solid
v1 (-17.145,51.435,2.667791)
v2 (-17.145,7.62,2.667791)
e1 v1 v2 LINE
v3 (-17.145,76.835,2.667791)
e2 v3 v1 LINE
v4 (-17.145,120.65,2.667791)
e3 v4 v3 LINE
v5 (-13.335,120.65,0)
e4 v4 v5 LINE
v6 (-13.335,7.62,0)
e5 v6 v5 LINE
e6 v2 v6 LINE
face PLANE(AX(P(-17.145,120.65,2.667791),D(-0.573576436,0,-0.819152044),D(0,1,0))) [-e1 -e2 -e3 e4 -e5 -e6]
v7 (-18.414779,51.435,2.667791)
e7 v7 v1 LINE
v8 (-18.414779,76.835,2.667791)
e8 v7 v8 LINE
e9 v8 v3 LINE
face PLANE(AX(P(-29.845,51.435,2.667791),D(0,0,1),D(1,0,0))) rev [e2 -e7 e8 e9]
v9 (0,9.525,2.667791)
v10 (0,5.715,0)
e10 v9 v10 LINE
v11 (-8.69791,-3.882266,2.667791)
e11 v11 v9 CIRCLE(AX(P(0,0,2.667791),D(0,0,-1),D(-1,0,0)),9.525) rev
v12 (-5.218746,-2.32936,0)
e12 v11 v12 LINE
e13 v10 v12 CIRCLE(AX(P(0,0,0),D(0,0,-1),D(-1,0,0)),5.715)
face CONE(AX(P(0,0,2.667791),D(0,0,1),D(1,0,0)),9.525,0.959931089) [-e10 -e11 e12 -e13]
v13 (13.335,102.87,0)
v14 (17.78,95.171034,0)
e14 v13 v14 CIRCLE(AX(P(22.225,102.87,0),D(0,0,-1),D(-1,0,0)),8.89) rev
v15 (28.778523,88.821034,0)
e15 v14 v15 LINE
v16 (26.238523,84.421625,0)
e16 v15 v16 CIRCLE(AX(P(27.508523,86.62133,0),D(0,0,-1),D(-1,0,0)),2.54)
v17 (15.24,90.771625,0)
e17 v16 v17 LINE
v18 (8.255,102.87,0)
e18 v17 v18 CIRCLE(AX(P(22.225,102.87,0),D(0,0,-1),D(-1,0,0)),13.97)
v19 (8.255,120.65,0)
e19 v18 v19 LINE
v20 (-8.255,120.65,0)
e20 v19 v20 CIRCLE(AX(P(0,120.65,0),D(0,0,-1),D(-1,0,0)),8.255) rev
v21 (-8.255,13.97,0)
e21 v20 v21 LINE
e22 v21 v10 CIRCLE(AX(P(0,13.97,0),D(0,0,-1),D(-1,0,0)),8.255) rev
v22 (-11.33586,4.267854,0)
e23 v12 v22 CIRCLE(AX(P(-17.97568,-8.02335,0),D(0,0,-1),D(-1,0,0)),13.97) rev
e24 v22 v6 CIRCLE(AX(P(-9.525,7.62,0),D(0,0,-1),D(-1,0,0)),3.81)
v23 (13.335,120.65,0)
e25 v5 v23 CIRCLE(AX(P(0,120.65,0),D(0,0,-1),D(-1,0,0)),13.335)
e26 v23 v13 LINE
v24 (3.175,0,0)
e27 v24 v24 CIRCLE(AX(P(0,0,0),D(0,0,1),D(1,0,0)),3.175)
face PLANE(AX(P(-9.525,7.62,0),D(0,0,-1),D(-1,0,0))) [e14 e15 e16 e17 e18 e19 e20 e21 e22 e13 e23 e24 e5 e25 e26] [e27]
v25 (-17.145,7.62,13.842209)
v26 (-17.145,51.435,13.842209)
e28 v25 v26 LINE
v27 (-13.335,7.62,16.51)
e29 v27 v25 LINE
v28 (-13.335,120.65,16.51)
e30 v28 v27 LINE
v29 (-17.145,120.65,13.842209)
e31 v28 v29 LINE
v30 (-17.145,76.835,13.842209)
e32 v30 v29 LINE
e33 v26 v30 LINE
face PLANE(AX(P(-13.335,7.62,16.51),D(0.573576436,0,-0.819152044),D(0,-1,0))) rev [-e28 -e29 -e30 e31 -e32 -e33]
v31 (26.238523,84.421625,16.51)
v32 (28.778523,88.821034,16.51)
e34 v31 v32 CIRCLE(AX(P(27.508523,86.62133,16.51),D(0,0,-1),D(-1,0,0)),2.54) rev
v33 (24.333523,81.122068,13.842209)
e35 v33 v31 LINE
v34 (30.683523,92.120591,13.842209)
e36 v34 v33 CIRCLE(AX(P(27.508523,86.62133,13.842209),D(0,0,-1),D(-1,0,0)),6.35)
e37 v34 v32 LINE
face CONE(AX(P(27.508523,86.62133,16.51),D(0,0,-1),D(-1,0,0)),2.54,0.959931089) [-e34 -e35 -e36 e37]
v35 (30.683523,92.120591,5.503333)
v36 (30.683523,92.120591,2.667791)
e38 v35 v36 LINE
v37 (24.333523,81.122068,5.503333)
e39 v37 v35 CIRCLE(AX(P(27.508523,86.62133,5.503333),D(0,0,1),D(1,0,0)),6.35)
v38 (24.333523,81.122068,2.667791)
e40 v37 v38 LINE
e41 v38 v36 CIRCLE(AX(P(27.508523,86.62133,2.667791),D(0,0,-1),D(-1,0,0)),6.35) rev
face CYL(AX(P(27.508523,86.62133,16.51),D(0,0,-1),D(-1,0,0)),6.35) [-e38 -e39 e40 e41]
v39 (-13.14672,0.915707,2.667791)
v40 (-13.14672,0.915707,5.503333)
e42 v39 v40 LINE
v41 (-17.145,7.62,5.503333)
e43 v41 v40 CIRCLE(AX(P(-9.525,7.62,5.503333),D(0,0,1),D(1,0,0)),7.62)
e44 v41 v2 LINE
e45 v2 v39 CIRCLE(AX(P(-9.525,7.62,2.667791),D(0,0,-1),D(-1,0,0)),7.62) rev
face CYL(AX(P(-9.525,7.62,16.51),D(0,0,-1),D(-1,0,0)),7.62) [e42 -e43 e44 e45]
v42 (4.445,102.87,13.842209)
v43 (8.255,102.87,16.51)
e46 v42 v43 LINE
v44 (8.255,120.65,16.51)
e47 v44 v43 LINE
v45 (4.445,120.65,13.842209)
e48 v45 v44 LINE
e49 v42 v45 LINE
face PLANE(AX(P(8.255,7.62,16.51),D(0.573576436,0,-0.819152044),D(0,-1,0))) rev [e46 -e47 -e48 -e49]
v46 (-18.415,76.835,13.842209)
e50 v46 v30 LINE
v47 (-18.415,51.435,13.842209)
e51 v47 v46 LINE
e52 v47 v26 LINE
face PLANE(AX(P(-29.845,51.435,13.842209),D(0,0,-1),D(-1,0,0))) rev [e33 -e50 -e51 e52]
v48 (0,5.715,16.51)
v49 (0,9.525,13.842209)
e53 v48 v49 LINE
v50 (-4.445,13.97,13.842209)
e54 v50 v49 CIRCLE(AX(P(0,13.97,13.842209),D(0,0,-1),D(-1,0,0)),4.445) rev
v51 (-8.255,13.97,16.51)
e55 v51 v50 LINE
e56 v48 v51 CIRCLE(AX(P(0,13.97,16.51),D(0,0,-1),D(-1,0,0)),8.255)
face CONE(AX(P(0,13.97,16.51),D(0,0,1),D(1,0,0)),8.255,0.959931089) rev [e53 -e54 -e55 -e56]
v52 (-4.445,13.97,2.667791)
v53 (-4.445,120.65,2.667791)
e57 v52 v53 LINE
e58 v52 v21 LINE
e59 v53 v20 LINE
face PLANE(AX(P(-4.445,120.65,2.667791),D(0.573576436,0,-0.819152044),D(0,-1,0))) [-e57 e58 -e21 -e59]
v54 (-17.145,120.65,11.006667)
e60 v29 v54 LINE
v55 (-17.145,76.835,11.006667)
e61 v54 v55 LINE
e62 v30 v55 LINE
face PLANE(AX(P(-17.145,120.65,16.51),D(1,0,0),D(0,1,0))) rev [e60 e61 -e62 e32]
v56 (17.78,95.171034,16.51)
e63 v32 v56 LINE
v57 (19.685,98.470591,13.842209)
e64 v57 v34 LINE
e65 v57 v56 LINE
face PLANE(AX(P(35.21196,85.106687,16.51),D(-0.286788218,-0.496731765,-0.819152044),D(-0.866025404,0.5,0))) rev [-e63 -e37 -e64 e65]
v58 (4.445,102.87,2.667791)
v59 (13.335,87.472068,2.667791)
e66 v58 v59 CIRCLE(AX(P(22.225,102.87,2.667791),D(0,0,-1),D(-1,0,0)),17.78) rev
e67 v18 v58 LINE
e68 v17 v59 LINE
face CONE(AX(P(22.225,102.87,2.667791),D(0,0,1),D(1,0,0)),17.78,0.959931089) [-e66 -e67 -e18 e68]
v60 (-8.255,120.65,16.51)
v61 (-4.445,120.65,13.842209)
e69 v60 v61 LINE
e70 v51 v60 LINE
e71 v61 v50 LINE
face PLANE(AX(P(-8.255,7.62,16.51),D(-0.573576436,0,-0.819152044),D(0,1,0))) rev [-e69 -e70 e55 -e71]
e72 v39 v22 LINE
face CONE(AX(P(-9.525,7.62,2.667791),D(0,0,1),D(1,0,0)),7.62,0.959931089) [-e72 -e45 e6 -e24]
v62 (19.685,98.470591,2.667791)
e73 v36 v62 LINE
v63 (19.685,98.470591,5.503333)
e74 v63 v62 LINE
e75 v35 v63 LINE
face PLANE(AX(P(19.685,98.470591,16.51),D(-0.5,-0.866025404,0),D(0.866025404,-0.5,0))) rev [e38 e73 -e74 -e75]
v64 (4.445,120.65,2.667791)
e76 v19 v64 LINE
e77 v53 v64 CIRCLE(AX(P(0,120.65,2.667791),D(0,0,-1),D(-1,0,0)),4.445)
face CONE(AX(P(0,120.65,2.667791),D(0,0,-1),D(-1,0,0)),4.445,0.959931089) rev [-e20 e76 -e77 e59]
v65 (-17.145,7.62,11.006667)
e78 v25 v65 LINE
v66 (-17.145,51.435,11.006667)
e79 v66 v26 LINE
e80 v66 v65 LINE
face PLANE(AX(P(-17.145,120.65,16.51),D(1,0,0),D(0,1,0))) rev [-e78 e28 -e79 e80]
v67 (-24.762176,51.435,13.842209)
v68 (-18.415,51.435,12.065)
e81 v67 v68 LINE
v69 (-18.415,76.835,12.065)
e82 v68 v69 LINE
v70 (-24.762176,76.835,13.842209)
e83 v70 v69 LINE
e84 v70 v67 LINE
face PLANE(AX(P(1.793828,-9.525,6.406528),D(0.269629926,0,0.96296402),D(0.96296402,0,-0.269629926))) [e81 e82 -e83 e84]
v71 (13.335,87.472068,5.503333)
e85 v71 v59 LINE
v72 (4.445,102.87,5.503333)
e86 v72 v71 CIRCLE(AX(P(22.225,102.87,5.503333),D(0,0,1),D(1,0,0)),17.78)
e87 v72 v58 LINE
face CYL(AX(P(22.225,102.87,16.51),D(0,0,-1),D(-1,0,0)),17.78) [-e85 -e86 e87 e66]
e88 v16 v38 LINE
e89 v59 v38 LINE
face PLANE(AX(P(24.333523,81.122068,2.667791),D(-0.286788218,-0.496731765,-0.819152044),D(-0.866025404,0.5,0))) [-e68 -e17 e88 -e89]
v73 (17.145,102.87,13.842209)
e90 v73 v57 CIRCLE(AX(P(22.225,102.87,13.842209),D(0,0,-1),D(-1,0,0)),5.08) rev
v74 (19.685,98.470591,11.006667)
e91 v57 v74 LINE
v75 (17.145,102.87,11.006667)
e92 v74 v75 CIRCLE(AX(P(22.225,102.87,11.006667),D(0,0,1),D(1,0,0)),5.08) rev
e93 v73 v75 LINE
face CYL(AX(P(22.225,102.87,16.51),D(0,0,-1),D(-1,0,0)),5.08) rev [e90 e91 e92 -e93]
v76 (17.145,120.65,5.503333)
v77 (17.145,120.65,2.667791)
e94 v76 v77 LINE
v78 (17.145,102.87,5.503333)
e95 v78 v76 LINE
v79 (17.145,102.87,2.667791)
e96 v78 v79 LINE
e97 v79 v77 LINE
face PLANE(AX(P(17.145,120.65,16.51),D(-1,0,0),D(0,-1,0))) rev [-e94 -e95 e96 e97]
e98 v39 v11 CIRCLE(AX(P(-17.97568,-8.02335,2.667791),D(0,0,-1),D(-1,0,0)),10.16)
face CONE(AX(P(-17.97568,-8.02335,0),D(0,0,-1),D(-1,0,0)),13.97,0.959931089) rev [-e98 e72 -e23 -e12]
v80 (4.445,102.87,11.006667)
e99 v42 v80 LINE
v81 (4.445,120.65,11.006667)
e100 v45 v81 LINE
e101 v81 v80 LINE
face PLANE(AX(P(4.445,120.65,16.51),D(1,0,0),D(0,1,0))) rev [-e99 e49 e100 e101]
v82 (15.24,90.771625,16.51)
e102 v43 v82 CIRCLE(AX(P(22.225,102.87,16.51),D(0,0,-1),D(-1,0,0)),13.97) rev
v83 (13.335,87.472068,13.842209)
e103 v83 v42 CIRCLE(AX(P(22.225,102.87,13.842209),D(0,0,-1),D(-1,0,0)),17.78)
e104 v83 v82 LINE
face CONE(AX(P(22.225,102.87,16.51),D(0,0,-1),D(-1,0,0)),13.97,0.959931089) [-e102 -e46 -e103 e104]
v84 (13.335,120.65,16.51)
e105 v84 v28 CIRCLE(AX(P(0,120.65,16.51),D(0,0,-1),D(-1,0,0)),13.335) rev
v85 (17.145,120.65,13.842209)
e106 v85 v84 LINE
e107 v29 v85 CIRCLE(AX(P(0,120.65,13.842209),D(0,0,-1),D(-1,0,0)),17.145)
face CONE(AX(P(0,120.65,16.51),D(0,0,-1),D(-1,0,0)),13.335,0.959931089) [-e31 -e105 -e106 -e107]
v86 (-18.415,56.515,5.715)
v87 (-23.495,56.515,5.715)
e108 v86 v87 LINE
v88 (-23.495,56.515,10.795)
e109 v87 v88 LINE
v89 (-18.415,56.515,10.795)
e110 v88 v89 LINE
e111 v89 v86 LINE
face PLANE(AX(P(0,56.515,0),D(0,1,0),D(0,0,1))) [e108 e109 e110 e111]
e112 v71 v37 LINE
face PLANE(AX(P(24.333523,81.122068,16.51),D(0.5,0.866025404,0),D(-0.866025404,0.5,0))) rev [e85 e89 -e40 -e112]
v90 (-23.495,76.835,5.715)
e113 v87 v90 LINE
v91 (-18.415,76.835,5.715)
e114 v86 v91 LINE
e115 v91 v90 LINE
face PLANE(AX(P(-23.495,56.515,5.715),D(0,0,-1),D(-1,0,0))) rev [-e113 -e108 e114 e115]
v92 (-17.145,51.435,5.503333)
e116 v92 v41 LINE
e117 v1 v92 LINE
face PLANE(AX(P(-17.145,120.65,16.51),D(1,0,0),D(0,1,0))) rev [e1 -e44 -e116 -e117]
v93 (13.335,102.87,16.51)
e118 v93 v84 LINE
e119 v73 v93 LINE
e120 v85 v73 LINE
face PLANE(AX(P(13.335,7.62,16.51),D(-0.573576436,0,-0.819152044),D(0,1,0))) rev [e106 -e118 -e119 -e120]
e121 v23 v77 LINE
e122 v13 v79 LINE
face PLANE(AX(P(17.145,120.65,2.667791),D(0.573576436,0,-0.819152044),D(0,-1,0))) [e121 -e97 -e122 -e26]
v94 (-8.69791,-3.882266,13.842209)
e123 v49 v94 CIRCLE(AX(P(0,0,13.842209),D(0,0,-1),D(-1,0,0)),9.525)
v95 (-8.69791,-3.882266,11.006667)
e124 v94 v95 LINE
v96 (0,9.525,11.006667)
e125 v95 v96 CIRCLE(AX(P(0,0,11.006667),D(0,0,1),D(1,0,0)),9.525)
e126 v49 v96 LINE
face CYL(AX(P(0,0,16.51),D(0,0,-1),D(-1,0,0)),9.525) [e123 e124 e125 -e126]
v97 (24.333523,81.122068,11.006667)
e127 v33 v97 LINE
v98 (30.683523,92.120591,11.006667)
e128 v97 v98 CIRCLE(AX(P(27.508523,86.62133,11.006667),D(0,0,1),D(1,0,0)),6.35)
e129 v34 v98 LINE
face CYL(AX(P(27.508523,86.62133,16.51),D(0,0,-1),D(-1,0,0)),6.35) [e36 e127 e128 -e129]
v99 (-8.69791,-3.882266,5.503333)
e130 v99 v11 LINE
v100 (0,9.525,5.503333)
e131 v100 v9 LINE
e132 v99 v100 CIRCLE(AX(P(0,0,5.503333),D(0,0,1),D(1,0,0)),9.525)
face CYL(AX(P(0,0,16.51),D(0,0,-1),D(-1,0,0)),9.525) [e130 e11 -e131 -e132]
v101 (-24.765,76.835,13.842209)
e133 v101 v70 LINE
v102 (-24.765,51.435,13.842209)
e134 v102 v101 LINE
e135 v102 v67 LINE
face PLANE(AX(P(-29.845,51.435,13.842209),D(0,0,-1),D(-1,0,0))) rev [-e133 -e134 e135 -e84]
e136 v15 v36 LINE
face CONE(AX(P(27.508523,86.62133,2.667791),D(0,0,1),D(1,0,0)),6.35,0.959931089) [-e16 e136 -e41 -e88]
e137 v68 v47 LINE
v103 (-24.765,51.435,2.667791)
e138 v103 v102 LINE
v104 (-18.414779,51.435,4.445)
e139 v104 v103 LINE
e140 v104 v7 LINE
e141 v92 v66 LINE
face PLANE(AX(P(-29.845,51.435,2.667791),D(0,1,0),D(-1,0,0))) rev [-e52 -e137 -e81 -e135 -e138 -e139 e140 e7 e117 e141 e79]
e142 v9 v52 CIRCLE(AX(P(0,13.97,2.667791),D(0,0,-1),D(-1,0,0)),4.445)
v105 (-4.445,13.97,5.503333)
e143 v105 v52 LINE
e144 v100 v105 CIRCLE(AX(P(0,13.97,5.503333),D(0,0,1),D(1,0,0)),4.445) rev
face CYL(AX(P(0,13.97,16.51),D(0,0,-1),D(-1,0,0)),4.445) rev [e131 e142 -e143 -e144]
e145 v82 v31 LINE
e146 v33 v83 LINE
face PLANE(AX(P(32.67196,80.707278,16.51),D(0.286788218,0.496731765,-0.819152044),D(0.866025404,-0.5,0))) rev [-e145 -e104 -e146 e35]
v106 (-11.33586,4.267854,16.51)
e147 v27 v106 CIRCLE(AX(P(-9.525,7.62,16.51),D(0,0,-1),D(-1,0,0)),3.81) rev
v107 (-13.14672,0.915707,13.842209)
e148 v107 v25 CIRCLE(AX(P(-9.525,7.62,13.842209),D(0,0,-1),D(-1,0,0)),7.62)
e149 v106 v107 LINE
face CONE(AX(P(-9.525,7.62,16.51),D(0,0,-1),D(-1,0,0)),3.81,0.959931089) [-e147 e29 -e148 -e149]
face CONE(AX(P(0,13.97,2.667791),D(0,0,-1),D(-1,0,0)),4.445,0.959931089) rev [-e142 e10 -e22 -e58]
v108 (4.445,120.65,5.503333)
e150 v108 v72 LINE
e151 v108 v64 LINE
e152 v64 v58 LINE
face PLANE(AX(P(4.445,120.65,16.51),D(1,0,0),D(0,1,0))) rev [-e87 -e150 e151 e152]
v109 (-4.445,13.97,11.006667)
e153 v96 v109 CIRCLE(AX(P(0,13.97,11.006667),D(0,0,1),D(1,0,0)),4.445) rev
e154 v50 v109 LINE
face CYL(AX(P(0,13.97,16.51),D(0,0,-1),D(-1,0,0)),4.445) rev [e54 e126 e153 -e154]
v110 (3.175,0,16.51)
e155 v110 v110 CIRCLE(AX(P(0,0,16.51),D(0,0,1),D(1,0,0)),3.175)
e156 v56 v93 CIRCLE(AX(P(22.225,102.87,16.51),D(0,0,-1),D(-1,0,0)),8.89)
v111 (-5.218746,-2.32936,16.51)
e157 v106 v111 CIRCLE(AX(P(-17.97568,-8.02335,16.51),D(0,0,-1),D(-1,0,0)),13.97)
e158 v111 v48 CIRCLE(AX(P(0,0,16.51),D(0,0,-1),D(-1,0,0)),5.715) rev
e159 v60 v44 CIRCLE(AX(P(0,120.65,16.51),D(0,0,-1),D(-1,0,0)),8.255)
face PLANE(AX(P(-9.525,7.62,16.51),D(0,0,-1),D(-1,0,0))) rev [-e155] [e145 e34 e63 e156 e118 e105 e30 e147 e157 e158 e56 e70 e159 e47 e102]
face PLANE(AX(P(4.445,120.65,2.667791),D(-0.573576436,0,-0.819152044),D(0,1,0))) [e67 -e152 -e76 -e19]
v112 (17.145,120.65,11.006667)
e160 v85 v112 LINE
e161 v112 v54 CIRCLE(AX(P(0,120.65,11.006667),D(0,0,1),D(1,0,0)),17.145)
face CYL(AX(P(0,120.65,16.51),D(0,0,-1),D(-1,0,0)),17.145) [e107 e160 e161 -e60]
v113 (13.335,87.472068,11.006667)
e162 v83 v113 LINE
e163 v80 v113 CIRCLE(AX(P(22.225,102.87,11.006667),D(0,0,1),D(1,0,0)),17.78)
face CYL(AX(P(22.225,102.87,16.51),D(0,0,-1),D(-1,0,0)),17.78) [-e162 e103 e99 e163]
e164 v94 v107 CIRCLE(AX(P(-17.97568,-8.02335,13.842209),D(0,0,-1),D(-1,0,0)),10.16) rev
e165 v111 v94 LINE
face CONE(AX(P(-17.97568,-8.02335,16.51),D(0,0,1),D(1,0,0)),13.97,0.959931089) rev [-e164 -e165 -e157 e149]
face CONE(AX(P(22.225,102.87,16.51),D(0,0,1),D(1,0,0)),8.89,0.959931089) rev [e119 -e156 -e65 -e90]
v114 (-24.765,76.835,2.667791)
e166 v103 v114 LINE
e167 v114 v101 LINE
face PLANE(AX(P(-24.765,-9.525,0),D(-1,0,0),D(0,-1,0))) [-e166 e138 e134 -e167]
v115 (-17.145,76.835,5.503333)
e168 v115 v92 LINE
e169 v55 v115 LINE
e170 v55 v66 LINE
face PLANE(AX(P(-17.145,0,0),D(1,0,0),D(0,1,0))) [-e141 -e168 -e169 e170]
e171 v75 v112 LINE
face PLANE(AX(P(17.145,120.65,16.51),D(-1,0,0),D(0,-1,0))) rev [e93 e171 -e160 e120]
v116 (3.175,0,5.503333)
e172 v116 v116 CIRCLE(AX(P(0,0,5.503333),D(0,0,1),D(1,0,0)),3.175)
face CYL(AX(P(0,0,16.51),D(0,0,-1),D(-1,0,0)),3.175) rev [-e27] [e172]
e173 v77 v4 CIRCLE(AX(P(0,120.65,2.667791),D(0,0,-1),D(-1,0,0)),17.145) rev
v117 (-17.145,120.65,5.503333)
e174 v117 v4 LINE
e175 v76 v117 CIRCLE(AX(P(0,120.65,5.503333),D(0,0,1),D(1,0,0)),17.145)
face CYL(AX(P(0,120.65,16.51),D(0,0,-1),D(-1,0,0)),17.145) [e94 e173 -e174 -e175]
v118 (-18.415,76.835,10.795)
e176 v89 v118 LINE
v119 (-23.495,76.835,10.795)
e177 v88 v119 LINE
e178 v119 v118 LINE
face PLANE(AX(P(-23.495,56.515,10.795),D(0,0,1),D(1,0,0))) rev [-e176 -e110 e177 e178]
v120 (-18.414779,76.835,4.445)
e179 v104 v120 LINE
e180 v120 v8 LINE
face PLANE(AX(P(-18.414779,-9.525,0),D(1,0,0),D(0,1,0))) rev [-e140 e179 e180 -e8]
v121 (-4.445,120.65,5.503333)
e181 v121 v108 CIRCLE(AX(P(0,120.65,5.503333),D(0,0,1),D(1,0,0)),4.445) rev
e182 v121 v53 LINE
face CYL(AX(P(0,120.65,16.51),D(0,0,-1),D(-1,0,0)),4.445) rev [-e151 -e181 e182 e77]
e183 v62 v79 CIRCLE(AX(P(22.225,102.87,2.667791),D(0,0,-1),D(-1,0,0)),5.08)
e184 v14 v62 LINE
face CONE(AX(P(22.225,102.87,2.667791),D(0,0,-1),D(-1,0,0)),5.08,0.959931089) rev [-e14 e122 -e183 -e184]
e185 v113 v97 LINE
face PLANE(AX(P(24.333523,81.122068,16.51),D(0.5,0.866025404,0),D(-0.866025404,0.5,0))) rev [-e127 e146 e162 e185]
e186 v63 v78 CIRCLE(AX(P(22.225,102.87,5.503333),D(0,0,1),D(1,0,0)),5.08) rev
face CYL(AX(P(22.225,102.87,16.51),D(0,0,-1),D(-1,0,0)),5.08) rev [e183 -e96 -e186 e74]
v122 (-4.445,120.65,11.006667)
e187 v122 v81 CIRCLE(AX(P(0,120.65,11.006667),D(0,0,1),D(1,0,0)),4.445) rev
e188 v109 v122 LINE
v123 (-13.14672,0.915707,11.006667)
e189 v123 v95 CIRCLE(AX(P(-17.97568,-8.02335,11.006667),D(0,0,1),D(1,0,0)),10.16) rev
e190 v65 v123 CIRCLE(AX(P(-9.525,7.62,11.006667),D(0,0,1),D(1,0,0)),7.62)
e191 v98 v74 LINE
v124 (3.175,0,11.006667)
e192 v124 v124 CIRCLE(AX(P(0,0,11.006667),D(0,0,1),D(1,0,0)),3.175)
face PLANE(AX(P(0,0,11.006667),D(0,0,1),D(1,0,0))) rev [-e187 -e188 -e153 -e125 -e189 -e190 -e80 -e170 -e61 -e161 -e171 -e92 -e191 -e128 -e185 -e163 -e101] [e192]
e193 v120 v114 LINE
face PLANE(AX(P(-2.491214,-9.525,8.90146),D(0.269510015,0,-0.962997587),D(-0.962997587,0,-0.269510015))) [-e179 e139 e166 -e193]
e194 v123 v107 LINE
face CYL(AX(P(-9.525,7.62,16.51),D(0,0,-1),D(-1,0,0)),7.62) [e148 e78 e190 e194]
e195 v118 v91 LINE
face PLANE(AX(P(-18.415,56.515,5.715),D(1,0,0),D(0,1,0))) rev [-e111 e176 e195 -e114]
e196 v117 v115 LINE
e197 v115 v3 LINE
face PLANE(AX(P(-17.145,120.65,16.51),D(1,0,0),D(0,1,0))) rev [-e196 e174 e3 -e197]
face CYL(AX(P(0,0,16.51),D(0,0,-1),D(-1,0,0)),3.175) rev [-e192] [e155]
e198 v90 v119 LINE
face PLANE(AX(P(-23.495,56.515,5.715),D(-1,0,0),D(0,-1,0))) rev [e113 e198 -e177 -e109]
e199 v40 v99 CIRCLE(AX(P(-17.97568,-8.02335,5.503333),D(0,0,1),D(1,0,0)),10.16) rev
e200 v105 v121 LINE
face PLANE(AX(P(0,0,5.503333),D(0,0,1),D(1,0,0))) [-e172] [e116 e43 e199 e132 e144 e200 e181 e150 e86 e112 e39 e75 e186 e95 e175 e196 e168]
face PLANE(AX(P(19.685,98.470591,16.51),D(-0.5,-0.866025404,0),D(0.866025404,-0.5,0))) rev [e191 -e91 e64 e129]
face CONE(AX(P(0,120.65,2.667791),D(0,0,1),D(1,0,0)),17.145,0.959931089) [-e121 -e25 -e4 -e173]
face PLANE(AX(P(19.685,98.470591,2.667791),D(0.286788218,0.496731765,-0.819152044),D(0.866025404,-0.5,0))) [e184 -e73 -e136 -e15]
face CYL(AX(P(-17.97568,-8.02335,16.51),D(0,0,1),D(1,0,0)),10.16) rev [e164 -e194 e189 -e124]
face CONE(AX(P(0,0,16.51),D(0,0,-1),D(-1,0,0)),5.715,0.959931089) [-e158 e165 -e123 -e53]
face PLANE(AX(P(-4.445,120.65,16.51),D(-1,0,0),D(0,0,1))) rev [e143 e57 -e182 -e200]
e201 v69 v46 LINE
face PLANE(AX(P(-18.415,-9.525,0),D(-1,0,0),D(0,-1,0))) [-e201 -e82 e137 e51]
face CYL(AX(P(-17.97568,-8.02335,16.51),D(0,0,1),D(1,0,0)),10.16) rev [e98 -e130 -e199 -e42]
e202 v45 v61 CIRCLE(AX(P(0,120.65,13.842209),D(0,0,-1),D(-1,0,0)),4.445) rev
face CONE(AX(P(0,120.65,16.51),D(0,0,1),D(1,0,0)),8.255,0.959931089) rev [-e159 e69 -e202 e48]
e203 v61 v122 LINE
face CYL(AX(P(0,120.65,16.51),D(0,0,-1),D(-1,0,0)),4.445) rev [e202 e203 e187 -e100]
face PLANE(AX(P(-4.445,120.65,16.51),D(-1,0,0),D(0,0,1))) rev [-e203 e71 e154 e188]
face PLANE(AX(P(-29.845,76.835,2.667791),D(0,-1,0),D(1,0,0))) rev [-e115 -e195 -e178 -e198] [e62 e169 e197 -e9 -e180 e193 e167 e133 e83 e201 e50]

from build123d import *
from OCP.BRepFilletAPI import BRepFilletAPI_MakeChamfer

# Parameters (mm, degrees)
SKETCH1_R           = 3.175
BOSS_EXTRUDE1_DEPTH = 16.51
FILLET1_R           = 10.16
CHAMFER1_SIZE       = 3.81
CHAMFER1_SIZE2      = 2.667790721
SPLIT1_START        = 5.503333164
SPLIT1_OUTLINE_R    = 3.175
SPLIT1_DEPTH        = 5.503333418
SKETCH4_W           = 11.174418558
SKETCH4_H           = 25.4
BOSS_EXTRUDE2_DEPTH = 12.7
SKETCH5_W           = 5.08
SKETCH5_H           = 11.174418558
CUT_EXTRUDE1_DEPTH  = 95.217988066
SKETCH7_W           = 5.08
SKETCH7_H           = 5.08
CUT_EXTRUDE2_DEPTH  = 20.32


# Read off the part's stored shape, not the designer's step: Split1
with BuildPart() as part:
    # Sketch1 → Boss-Extrude1 (new body)
    with BuildSketch(Plane.XY):
        with BuildLine():
            Line((4.445, 120.65), (4.445, 102.87))
            ThreePointArc((4.445, 102.87), (6.827068321, 93.98), (13.335, 87.472068321))
            Line((13.335, 87.472068321), (24.333522628, 81.122068321))
            ThreePointArc((24.333522628, 81.122068321), (33.007783942, 83.446329635), (30.683522628, 92.120590949))
            Line((30.683522628, 92.120590949), (19.685, 98.470590949))
            ThreePointArc((19.685, 98.470590949), (17.825590949, 100.33), (17.145, 102.87))
            Line((17.145, 102.87), (17.145, 120.65))
            ThreePointArc((17.145, 120.65), (0, 137.795), (-17.145, 120.65))
            Line((-17.145, 120.65), (-17.145, 7.62))
            ThreePointArc((-17.145, 7.62), (-14.913153673, 2.231846327), (-9.525, 0))
            ThreePointArc((-9.525, 0), (6.735192091, -6.735192091), (0, 9.525))
            ThreePointArc((0, 9.525), (-3.143089642, 10.826910358), (-4.445, 13.97))
            Line((-4.445, 13.97), (-4.445, 120.65))
            ThreePointArc((-4.445, 120.65), (0, 125.095), (4.445, 120.65))
        make_face()
        Circle(SKETCH1_R, mode=Mode.SUBTRACT)
    extrude(amount=BOSS_EXTRUDE1_DEPTH)

    # Fillet1
    fillet1_edges = [part.edges().sort_by_distance(p)[0] for p in [
        (-9.525, 0, 8.255),
    ]]
    fillet(fillet1_edges, radius=FILLET1_R)

    # Chamfer1: one chamfer whose edges measure the first distance from different faces: ONE call of the kernel's chamfer builder (chamfer() names one face for all edges)
    chamfer1_edges_1 = [part.edges().sort_by_distance(p)[0] for p in [
        (-3.143089642, 10.826910358, 16.51),
        (-4.445, 67.31, 16.51),
        (0, 125.095, 16.51),
        (4.445, 111.76, 16.51),
        (6.827068321, 93.98, 16.51),
        (18.834261314, 84.297068321, 16.51),
        (33.007783942, 83.446329635, 16.51),
        (25.184261314, 95.295590949, 16.51),
        (17.825590949, 100.33, 16.51),
        (7.990751239, -5.183967557, 16.51),
        (-10.525505779, -1.115347445, 16.51),
        (17.145, 111.76, 16.51),
        (-16.069536152, 3.716995189, 16.51),
        (0, 137.795, 16.51),
        (-17.145, 64.135, 16.51),
    ]]
    chamfer1_side_1 = [part.faces().sort_by_distance(p)[0] for p in [
        (-14.730576104, 4.515518933, 16.51),
    ]]
    chamfer1_edges_2 = [part.edges().sort_by_distance(p)[0] for p in [
        (-17.145, 64.135, 0),
        (0, 137.795, 0),
        (17.145, 111.76, 0),
        (17.825590949, 100.33, 0),
        (25.184261314, 95.295590949, 0),
        (33.007783942, 83.446329635, 0),
        (18.834261314, 84.297068321, 0),
        (6.827068321, 93.98, 0),
        (4.445, 111.76, 0),
        (0, 125.095, 0),
        (-4.445, 67.31, 0),
        (-3.143089642, 10.826910358, 0),
        (-16.069536152, 3.716995189, 0),
        (7.990751239, -5.183967557, 0),
        (-10.525505779, -1.115347445, 0),
    ]]
    chamfer1_side_2 = [part.faces().sort_by_distance(p)[0] for p in [
        (-14.730576104, 4.515518933, 0),
    ]]
    chamfer1 = BRepFilletAPI_MakeChamfer(part.part.solid().wrapped)
    for e in chamfer1_edges_1:
        chamfer1.Add(CHAMFER1_SIZE, CHAMFER1_SIZE2, e.wrapped, chamfer1_side_1[0].wrapped)  # the first distance lies on this face
    for e in chamfer1_edges_2:
        chamfer1.Add(CHAMFER1_SIZE, CHAMFER1_SIZE2, e.wrapped, chamfer1_side_2[0].wrapped)  # the first distance lies on this face
    add(Compound.cast(chamfer1.Shape()), mode=Mode.REPLACE)

    # Split1 outline → Split1 (cut)
    with BuildSketch(Plane.XY.offset(SPLIT1_START)):
        with BuildLine():
            ThreePointArc((-17.145, 7.62), (-16.069536152, 3.716995189), (-13.146720064, 0.915707063))
            ThreePointArc((-13.146720064, 0.915707063), (-10.525505779, -1.115347445), (-8.697909749, -3.882266219))
            ThreePointArc((-8.697909749, -3.882266219), (7.990751239, -5.183967557), (0, 9.525))
            ThreePointArc((0, 9.525), (-3.143089642, 10.826910358), (-4.445, 13.97))
            Line((-4.445, 13.97), (-4.445, 120.65))
            ThreePointArc((-4.445, 120.65), (0, 125.095), (4.445, 120.65))
            Line((4.445, 120.65), (4.445, 102.87))
            ThreePointArc((4.445, 102.87), (6.827068321, 93.98), (13.335, 87.472068321))
            Line((13.335, 87.472068321), (24.333522628, 81.122068321))
            ThreePointArc((24.333522628, 81.122068321), (33.007783942, 83.446329635), (30.683522628, 92.120590949))
            Line((30.683522628, 92.120590949), (19.685, 98.470590949))
            ThreePointArc((19.685, 98.470590949), (17.825590949, 100.33), (17.145, 102.87))
            Line((17.145, 102.87), (17.145, 120.65))
            ThreePointArc((17.145, 120.65), (0, 137.795), (-17.145, 120.65))
            Line((-17.145, 120.65), (-17.145, 7.62))
        make_face()
        Circle(SPLIT1_OUTLINE_R, mode=Mode.SUBTRACT)
    extrude(amount=SPLIT1_DEPTH, mode=Mode.SUBTRACT)

    # Sketch4 → Boss-Extrude2 (add)
    with BuildSketch(Plane.ZY.offset(17.145)):
        with Locations((8.255, 64.135)):
            Rectangle(SKETCH4_W, SKETCH4_H)
    extrude(amount=BOSS_EXTRUDE2_DEPTH)

    # Sketch5 → Cut-Extrude1 (cut, through all)
    with BuildSketch(Plane(origin=(0, 76.835, 0), x_dir=(1, 0, 0), z_dir=(0, 1, 0))):
        Polygon((-24.765, -2.667790721), (-18.414778652, -4.445000002), (-18.414778652, -2.667790721), align=None)
        with Locations((-27.305, -8.255)):
            Rectangle(SKETCH5_W, SKETCH5_H)
        Polygon((-18.415, -12.064999998), (-24.762176004, -13.842209279), (-18.415, -13.842209279), align=None)
    extrude(amount=-CUT_EXTRUDE1_DEPTH, mode=Mode.SUBTRACT)

    # Sketch7 → Cut-Extrude2 (cut)
    with BuildSketch(Plane(origin=(0, 76.835, 0), x_dir=(1, 0, 0), z_dir=(0, 1, 0))):
        with Locations((-20.955000002, -8.255)):
            Rectangle(SKETCH7_W, SKETCH7_H)
    extrude(amount=-CUT_EXTRUDE2_DEPTH, mode=Mode.SUBTRACT)


solid = part.part
